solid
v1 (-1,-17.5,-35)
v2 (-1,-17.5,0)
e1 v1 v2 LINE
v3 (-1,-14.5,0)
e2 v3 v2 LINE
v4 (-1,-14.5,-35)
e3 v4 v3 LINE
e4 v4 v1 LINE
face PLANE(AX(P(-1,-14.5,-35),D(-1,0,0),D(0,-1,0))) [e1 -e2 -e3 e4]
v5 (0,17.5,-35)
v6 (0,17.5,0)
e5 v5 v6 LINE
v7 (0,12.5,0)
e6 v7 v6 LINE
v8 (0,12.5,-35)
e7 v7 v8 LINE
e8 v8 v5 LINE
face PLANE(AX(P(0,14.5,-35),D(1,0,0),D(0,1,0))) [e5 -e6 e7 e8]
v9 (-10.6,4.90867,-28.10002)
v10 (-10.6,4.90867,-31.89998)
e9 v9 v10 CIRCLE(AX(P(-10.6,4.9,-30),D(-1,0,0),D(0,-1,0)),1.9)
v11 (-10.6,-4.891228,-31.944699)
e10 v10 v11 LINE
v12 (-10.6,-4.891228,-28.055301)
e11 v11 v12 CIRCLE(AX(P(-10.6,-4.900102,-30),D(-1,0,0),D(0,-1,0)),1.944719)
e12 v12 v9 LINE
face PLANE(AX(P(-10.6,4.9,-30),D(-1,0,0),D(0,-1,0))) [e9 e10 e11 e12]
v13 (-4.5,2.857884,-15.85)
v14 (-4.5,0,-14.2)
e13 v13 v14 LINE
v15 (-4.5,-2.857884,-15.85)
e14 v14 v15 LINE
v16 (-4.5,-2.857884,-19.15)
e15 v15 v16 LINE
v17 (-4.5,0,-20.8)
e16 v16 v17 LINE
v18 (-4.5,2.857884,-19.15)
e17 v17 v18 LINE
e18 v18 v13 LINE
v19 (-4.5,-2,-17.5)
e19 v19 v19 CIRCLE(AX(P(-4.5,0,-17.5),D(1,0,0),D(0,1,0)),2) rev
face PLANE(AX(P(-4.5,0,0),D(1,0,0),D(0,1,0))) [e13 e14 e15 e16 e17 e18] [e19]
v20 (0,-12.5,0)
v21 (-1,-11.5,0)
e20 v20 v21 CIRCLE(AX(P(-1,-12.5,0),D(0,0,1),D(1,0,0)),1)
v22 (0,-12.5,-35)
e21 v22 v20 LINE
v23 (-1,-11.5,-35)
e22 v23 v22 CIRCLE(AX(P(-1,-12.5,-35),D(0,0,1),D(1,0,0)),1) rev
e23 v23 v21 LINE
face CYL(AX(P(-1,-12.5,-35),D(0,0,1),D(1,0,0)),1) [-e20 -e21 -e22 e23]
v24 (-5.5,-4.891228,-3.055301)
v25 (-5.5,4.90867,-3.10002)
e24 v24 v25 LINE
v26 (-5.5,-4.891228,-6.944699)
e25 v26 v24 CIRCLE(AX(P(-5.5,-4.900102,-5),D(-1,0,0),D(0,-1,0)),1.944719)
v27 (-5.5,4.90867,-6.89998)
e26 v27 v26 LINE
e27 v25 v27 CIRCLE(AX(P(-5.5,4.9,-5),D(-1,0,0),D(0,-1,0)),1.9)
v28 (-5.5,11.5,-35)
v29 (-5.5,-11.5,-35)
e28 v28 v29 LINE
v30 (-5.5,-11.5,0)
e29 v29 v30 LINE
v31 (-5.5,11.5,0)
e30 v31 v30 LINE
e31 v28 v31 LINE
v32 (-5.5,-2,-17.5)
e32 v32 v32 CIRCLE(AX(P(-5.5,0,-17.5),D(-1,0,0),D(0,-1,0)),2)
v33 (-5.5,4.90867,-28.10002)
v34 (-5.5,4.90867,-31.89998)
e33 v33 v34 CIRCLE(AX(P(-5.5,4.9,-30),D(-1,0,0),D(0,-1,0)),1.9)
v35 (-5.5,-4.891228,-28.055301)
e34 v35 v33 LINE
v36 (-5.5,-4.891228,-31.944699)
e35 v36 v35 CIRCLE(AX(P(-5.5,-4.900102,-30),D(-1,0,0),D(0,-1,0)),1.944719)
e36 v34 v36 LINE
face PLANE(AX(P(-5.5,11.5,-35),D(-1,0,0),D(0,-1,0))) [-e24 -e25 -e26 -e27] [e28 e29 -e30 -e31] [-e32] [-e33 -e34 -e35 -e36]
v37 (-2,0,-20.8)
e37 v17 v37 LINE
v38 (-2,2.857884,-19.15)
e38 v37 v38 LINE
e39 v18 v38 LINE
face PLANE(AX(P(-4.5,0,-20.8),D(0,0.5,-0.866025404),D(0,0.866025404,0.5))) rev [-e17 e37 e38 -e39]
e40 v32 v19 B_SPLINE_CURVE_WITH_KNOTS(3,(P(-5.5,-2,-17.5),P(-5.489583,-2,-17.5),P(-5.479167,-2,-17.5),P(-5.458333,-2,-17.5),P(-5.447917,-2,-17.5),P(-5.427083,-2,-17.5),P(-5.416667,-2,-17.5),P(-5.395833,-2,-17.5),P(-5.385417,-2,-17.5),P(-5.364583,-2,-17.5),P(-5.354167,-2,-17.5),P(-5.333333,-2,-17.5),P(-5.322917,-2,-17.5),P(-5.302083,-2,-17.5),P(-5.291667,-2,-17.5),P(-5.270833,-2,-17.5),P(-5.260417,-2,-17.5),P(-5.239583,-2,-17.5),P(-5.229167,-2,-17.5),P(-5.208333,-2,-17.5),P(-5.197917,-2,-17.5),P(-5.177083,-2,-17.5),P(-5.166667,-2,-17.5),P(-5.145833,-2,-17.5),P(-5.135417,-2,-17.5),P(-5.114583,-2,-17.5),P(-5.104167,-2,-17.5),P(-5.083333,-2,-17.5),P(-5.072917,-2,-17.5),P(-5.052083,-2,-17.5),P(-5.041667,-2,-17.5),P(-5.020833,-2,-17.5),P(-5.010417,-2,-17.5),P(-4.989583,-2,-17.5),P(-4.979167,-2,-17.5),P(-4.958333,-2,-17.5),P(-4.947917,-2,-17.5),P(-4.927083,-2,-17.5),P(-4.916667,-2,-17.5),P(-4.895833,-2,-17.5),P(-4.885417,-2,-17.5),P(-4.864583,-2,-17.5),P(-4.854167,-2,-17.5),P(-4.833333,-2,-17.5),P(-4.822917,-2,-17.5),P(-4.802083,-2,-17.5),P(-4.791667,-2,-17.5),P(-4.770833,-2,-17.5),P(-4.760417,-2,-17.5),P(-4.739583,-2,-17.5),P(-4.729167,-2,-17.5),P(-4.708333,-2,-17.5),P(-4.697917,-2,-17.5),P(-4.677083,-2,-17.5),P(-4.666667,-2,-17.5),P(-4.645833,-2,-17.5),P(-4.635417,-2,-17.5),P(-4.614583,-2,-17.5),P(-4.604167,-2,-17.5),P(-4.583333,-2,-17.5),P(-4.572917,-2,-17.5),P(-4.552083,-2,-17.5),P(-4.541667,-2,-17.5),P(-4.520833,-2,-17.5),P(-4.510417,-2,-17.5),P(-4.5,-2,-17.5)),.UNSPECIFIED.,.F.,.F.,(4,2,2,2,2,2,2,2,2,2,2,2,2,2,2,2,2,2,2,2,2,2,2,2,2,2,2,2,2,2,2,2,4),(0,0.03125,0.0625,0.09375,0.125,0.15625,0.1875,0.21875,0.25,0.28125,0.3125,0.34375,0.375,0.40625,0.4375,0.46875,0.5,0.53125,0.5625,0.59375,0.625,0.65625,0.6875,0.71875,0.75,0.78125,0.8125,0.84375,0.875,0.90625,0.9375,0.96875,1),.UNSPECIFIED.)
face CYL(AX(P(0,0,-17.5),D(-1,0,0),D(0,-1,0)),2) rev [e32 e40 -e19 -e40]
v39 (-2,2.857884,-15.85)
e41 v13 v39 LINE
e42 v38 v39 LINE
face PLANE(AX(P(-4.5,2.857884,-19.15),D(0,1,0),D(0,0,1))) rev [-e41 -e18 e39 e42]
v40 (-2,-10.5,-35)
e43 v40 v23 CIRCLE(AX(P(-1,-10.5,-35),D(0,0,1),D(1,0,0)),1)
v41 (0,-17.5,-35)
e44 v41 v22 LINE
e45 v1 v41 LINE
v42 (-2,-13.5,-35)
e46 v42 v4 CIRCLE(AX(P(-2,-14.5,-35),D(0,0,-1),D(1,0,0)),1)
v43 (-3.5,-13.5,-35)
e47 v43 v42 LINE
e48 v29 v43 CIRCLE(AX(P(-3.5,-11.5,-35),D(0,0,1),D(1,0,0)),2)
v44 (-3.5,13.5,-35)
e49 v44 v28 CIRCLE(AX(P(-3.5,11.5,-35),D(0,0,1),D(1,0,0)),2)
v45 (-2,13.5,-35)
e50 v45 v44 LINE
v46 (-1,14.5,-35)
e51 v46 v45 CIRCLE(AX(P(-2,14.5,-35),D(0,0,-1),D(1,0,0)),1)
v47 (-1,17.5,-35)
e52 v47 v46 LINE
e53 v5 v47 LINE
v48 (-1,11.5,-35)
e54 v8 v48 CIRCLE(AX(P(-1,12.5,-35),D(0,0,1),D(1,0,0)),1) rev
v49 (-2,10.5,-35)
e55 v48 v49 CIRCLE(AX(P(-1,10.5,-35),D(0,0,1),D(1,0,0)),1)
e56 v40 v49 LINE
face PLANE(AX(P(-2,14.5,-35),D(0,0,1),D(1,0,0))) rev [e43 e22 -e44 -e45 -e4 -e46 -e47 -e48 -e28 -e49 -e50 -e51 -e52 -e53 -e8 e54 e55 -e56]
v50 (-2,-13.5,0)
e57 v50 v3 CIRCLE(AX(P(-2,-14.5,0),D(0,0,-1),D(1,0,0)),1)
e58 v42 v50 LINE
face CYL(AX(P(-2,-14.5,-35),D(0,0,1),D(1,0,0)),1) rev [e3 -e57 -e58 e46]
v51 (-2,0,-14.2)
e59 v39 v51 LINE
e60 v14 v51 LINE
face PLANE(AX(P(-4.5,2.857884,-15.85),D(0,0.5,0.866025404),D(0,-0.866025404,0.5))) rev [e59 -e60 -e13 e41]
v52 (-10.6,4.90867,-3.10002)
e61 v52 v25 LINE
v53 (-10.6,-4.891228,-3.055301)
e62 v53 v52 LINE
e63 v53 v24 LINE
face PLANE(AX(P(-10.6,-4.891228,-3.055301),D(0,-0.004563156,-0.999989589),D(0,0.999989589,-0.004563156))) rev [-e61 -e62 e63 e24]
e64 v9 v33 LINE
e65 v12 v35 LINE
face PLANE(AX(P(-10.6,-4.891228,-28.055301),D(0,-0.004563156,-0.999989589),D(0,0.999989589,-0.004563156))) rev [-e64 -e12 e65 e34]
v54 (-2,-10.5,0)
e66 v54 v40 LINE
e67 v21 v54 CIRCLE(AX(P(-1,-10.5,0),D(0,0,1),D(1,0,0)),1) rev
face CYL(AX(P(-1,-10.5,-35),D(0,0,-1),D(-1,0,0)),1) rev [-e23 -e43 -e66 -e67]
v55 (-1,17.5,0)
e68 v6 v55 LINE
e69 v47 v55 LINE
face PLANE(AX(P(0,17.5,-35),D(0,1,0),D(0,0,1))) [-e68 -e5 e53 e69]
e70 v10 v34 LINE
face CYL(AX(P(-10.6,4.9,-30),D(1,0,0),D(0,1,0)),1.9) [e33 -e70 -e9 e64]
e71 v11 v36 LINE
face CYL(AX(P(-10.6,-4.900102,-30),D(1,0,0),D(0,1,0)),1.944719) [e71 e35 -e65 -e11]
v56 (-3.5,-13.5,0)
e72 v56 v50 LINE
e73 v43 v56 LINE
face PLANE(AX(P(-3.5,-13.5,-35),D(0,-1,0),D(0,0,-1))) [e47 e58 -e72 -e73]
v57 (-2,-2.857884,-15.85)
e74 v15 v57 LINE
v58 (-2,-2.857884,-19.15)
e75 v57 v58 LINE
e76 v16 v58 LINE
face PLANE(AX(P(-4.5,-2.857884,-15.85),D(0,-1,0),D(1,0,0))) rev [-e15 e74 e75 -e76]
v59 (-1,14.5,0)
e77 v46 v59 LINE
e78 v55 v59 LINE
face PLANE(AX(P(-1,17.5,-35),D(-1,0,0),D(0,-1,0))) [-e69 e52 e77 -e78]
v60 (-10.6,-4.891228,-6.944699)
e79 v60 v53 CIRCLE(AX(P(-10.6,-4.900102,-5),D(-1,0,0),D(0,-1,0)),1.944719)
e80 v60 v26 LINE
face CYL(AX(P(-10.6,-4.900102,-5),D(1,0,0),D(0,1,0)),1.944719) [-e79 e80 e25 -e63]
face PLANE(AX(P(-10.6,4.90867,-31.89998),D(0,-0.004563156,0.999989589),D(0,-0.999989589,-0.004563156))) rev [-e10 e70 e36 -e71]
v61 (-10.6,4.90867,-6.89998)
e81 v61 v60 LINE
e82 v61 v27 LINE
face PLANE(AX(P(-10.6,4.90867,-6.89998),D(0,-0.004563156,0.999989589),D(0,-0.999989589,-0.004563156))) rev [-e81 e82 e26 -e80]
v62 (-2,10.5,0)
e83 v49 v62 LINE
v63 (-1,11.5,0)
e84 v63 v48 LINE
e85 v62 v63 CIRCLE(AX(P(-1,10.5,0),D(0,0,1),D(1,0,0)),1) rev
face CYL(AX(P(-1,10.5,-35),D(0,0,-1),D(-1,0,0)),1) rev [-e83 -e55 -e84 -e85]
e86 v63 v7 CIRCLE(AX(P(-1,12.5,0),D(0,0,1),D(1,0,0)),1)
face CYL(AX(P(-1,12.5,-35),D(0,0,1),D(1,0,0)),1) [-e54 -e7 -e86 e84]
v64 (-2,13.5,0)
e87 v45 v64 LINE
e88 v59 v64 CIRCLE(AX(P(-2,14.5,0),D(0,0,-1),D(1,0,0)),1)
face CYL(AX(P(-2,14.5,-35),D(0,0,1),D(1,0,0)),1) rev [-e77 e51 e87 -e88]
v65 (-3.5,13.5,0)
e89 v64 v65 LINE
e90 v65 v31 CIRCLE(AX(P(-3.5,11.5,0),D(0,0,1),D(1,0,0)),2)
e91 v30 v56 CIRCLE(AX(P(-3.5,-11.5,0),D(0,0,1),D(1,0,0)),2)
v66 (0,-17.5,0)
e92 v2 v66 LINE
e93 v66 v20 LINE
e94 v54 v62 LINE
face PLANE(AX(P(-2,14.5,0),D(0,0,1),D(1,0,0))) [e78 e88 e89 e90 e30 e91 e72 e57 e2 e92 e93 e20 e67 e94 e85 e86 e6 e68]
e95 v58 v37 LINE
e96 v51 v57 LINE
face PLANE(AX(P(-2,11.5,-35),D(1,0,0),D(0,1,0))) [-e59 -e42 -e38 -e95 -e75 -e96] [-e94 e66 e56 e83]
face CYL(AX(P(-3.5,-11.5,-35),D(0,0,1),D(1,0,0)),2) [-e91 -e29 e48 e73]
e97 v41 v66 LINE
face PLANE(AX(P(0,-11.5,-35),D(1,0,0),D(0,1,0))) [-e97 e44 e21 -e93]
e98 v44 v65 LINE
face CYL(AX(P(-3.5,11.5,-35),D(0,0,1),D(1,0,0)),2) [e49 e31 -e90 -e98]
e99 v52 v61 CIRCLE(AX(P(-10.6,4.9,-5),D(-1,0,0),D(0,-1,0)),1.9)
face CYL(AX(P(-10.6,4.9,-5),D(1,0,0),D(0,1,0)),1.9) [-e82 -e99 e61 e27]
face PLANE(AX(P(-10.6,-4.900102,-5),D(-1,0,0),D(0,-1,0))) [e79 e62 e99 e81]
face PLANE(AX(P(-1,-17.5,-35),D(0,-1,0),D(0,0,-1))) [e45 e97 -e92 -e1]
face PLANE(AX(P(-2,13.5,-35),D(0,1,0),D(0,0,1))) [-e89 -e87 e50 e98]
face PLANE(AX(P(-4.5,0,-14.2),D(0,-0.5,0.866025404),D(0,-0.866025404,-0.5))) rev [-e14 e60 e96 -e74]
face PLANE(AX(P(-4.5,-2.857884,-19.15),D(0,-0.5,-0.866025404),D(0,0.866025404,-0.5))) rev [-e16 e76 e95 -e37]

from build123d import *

# Parameters (mm, degrees)
EXTRUDE_1_DEPTH     = 35
FILLET_START        = -36
FILLET_1_DEPTH      = 37
FILLET_START_2      = -35
FILLET_1_2_DEPTH    = 35
SKETCH_2_R          = 2
CUT_EXTRUDE_1_DEPTH = 40.515819617
CUT_EXTRUDE_2_DEPTH = 2.5
EXTRUDE_2_DEPTH     = 5.1


with BuildPart() as part:
    # 草图1 → 凸台-拉伸1 (new body)
    with BuildSketch(Plane.XY):
        with BuildLine():
            Line((-2, 11.5), (-2, -11.5))
            Line((-2, -11.5), (0, -11.5))
            Line((0, -11.5), (0, -14.5))
            Line((0, -14.5), (0, -17.5))
            Line((0, -17.5), (-1, -17.5))
            Line((-1, -17.5), (-1, -14.5))
            ThreePointArc((-1, -14.5), (-1.292893219, -13.792893219), (-2, -13.5))
            Line((-2, -13.5), (-3.5, -13.5))
            ThreePointArc((-3.5, -13.5), (-4.914213562, -12.914213562), (-5.5, -11.5))
            Line((-5.5, -11.5), (-5.5, 11.5))
            ThreePointArc((-5.5, 11.5), (-4.914213562, 12.914213562), (-3.5, 13.5))
            Line((-3.5, 13.5), (-2, 13.5))
            ThreePointArc((-2, 13.5), (-1.292893219, 13.792893219), (-1, 14.5))
            Line((-1, 14.5), (-1, 17.5))
            Line((-1, 17.5), (0, 17.5))
            Line((0, 17.5), (0, 14.5))
            Line((0, 14.5), (0, 11.5))
            Line((0, 11.5), (-2, 11.5))
        make_face()
    extrude(amount=-EXTRUDE_1_DEPTH)

    # 圆角1: read off the stored shape, not the designer's step
    # 圆角1 outline → 圆角1 (cut)
    with BuildSketch(Plane.XY.offset(FILLET_START)):
        with BuildLine():
            Line((0, -11.5), (-1, -11.5))
            ThreePointArc((-1, -11.5), (-0.292893219, -11.792893219), (0, -12.5))
            Line((0, -12.5), (0, -11.5))
        make_face()
        with BuildLine():
            ThreePointArc((0, 12.5), (-0.292893219, 11.792893219), (-1, 11.5))
            Line((-1, 11.5), (0, 11.5))
            Line((0, 11.5), (0, 12.5))
        make_face()
    extrude(amount=FILLET_1_DEPTH, mode=Mode.SUBTRACT)

    # Fillet 1 2 outline → Fillet 1 2 (add)
    with BuildSketch(Plane.XY.offset(FILLET_START_2)):
        with BuildLine():
            Line((-2, -11.5), (-1, -11.5))
            ThreePointArc((-1, -11.5), (-1.707106781, -11.207106781), (-2, -10.5))
            Line((-2, -10.5), (-2, -11.5))
        make_face()
        with BuildLine():
            Line((-2, 11.5), (-2, 10.5))
            ThreePointArc((-2, 10.5), (-1.707106781, 11.207106781), (-1, 11.5))
            Line((-1, 11.5), (-2, 11.5))
        make_face()
    extrude(amount=FILLET_1_2_DEPTH)

    # 草图2 → 切除-拉伸1 (cut, through all)
    with BuildSketch(Plane.ZY.offset(5.5)):
        with Locations(Location((-17.5, 0, 0), (0, 0, 270))):
            Circle(SKETCH_2_R)
    extrude(amount=-CUT_EXTRUDE_1_DEPTH, mode=Mode.SUBTRACT)

    # 草图3 → 切除-拉伸2 (cut)
    with BuildSketch(Plane(origin=(-2, 0, 0), x_dir=(0, 0, -1), z_dir=(1, 0, 0))):
        Polygon((19.15, -2.857883832), (20.8, 0), (19.15, 2.857883832), (15.85, 2.857883832), (14.2, 0), (15.85, -2.857883832), align=None)
    extrude(amount=-CUT_EXTRUDE_2_DEPTH, mode=Mode.SUBTRACT)

    # 草图4 → 凸台-拉伸2 (add)
    with BuildSketch(Plane.ZY.offset(5.5)):
        with BuildLine():
            Line((-3.055300855, -4.891227974), (-3.100019781, 4.908669996))
            ThreePointArc((-3.100019781, 4.908669996), (-5, 6.8), (-6.899980219, 4.908669996))
            Line((-6.899980219, 4.908669996), (-6.944699145, -4.891227974))
            ThreePointArc((-6.944699145, -4.891227974), (-5, -6.844821423), (-3.055300855, -4.891227974))
        make_face()
        with BuildLine():
            Line((-31.899980219, 4.908669996), (-31.944699145, -4.891227974))
            ThreePointArc((-31.944699145, -4.891227974), (-30, -6.844821423), (-28.055300855, -4.891227974))
            Line((-28.055300855, -4.891227974), (-28.100019781, 4.908669996))
            ThreePointArc((-28.100019781, 4.908669996), (-30, 6.8), (-31.899980219, 4.908669996))
        make_face()
    extrude(amount=EXTRUDE_2_DEPTH)


solid = part.part
